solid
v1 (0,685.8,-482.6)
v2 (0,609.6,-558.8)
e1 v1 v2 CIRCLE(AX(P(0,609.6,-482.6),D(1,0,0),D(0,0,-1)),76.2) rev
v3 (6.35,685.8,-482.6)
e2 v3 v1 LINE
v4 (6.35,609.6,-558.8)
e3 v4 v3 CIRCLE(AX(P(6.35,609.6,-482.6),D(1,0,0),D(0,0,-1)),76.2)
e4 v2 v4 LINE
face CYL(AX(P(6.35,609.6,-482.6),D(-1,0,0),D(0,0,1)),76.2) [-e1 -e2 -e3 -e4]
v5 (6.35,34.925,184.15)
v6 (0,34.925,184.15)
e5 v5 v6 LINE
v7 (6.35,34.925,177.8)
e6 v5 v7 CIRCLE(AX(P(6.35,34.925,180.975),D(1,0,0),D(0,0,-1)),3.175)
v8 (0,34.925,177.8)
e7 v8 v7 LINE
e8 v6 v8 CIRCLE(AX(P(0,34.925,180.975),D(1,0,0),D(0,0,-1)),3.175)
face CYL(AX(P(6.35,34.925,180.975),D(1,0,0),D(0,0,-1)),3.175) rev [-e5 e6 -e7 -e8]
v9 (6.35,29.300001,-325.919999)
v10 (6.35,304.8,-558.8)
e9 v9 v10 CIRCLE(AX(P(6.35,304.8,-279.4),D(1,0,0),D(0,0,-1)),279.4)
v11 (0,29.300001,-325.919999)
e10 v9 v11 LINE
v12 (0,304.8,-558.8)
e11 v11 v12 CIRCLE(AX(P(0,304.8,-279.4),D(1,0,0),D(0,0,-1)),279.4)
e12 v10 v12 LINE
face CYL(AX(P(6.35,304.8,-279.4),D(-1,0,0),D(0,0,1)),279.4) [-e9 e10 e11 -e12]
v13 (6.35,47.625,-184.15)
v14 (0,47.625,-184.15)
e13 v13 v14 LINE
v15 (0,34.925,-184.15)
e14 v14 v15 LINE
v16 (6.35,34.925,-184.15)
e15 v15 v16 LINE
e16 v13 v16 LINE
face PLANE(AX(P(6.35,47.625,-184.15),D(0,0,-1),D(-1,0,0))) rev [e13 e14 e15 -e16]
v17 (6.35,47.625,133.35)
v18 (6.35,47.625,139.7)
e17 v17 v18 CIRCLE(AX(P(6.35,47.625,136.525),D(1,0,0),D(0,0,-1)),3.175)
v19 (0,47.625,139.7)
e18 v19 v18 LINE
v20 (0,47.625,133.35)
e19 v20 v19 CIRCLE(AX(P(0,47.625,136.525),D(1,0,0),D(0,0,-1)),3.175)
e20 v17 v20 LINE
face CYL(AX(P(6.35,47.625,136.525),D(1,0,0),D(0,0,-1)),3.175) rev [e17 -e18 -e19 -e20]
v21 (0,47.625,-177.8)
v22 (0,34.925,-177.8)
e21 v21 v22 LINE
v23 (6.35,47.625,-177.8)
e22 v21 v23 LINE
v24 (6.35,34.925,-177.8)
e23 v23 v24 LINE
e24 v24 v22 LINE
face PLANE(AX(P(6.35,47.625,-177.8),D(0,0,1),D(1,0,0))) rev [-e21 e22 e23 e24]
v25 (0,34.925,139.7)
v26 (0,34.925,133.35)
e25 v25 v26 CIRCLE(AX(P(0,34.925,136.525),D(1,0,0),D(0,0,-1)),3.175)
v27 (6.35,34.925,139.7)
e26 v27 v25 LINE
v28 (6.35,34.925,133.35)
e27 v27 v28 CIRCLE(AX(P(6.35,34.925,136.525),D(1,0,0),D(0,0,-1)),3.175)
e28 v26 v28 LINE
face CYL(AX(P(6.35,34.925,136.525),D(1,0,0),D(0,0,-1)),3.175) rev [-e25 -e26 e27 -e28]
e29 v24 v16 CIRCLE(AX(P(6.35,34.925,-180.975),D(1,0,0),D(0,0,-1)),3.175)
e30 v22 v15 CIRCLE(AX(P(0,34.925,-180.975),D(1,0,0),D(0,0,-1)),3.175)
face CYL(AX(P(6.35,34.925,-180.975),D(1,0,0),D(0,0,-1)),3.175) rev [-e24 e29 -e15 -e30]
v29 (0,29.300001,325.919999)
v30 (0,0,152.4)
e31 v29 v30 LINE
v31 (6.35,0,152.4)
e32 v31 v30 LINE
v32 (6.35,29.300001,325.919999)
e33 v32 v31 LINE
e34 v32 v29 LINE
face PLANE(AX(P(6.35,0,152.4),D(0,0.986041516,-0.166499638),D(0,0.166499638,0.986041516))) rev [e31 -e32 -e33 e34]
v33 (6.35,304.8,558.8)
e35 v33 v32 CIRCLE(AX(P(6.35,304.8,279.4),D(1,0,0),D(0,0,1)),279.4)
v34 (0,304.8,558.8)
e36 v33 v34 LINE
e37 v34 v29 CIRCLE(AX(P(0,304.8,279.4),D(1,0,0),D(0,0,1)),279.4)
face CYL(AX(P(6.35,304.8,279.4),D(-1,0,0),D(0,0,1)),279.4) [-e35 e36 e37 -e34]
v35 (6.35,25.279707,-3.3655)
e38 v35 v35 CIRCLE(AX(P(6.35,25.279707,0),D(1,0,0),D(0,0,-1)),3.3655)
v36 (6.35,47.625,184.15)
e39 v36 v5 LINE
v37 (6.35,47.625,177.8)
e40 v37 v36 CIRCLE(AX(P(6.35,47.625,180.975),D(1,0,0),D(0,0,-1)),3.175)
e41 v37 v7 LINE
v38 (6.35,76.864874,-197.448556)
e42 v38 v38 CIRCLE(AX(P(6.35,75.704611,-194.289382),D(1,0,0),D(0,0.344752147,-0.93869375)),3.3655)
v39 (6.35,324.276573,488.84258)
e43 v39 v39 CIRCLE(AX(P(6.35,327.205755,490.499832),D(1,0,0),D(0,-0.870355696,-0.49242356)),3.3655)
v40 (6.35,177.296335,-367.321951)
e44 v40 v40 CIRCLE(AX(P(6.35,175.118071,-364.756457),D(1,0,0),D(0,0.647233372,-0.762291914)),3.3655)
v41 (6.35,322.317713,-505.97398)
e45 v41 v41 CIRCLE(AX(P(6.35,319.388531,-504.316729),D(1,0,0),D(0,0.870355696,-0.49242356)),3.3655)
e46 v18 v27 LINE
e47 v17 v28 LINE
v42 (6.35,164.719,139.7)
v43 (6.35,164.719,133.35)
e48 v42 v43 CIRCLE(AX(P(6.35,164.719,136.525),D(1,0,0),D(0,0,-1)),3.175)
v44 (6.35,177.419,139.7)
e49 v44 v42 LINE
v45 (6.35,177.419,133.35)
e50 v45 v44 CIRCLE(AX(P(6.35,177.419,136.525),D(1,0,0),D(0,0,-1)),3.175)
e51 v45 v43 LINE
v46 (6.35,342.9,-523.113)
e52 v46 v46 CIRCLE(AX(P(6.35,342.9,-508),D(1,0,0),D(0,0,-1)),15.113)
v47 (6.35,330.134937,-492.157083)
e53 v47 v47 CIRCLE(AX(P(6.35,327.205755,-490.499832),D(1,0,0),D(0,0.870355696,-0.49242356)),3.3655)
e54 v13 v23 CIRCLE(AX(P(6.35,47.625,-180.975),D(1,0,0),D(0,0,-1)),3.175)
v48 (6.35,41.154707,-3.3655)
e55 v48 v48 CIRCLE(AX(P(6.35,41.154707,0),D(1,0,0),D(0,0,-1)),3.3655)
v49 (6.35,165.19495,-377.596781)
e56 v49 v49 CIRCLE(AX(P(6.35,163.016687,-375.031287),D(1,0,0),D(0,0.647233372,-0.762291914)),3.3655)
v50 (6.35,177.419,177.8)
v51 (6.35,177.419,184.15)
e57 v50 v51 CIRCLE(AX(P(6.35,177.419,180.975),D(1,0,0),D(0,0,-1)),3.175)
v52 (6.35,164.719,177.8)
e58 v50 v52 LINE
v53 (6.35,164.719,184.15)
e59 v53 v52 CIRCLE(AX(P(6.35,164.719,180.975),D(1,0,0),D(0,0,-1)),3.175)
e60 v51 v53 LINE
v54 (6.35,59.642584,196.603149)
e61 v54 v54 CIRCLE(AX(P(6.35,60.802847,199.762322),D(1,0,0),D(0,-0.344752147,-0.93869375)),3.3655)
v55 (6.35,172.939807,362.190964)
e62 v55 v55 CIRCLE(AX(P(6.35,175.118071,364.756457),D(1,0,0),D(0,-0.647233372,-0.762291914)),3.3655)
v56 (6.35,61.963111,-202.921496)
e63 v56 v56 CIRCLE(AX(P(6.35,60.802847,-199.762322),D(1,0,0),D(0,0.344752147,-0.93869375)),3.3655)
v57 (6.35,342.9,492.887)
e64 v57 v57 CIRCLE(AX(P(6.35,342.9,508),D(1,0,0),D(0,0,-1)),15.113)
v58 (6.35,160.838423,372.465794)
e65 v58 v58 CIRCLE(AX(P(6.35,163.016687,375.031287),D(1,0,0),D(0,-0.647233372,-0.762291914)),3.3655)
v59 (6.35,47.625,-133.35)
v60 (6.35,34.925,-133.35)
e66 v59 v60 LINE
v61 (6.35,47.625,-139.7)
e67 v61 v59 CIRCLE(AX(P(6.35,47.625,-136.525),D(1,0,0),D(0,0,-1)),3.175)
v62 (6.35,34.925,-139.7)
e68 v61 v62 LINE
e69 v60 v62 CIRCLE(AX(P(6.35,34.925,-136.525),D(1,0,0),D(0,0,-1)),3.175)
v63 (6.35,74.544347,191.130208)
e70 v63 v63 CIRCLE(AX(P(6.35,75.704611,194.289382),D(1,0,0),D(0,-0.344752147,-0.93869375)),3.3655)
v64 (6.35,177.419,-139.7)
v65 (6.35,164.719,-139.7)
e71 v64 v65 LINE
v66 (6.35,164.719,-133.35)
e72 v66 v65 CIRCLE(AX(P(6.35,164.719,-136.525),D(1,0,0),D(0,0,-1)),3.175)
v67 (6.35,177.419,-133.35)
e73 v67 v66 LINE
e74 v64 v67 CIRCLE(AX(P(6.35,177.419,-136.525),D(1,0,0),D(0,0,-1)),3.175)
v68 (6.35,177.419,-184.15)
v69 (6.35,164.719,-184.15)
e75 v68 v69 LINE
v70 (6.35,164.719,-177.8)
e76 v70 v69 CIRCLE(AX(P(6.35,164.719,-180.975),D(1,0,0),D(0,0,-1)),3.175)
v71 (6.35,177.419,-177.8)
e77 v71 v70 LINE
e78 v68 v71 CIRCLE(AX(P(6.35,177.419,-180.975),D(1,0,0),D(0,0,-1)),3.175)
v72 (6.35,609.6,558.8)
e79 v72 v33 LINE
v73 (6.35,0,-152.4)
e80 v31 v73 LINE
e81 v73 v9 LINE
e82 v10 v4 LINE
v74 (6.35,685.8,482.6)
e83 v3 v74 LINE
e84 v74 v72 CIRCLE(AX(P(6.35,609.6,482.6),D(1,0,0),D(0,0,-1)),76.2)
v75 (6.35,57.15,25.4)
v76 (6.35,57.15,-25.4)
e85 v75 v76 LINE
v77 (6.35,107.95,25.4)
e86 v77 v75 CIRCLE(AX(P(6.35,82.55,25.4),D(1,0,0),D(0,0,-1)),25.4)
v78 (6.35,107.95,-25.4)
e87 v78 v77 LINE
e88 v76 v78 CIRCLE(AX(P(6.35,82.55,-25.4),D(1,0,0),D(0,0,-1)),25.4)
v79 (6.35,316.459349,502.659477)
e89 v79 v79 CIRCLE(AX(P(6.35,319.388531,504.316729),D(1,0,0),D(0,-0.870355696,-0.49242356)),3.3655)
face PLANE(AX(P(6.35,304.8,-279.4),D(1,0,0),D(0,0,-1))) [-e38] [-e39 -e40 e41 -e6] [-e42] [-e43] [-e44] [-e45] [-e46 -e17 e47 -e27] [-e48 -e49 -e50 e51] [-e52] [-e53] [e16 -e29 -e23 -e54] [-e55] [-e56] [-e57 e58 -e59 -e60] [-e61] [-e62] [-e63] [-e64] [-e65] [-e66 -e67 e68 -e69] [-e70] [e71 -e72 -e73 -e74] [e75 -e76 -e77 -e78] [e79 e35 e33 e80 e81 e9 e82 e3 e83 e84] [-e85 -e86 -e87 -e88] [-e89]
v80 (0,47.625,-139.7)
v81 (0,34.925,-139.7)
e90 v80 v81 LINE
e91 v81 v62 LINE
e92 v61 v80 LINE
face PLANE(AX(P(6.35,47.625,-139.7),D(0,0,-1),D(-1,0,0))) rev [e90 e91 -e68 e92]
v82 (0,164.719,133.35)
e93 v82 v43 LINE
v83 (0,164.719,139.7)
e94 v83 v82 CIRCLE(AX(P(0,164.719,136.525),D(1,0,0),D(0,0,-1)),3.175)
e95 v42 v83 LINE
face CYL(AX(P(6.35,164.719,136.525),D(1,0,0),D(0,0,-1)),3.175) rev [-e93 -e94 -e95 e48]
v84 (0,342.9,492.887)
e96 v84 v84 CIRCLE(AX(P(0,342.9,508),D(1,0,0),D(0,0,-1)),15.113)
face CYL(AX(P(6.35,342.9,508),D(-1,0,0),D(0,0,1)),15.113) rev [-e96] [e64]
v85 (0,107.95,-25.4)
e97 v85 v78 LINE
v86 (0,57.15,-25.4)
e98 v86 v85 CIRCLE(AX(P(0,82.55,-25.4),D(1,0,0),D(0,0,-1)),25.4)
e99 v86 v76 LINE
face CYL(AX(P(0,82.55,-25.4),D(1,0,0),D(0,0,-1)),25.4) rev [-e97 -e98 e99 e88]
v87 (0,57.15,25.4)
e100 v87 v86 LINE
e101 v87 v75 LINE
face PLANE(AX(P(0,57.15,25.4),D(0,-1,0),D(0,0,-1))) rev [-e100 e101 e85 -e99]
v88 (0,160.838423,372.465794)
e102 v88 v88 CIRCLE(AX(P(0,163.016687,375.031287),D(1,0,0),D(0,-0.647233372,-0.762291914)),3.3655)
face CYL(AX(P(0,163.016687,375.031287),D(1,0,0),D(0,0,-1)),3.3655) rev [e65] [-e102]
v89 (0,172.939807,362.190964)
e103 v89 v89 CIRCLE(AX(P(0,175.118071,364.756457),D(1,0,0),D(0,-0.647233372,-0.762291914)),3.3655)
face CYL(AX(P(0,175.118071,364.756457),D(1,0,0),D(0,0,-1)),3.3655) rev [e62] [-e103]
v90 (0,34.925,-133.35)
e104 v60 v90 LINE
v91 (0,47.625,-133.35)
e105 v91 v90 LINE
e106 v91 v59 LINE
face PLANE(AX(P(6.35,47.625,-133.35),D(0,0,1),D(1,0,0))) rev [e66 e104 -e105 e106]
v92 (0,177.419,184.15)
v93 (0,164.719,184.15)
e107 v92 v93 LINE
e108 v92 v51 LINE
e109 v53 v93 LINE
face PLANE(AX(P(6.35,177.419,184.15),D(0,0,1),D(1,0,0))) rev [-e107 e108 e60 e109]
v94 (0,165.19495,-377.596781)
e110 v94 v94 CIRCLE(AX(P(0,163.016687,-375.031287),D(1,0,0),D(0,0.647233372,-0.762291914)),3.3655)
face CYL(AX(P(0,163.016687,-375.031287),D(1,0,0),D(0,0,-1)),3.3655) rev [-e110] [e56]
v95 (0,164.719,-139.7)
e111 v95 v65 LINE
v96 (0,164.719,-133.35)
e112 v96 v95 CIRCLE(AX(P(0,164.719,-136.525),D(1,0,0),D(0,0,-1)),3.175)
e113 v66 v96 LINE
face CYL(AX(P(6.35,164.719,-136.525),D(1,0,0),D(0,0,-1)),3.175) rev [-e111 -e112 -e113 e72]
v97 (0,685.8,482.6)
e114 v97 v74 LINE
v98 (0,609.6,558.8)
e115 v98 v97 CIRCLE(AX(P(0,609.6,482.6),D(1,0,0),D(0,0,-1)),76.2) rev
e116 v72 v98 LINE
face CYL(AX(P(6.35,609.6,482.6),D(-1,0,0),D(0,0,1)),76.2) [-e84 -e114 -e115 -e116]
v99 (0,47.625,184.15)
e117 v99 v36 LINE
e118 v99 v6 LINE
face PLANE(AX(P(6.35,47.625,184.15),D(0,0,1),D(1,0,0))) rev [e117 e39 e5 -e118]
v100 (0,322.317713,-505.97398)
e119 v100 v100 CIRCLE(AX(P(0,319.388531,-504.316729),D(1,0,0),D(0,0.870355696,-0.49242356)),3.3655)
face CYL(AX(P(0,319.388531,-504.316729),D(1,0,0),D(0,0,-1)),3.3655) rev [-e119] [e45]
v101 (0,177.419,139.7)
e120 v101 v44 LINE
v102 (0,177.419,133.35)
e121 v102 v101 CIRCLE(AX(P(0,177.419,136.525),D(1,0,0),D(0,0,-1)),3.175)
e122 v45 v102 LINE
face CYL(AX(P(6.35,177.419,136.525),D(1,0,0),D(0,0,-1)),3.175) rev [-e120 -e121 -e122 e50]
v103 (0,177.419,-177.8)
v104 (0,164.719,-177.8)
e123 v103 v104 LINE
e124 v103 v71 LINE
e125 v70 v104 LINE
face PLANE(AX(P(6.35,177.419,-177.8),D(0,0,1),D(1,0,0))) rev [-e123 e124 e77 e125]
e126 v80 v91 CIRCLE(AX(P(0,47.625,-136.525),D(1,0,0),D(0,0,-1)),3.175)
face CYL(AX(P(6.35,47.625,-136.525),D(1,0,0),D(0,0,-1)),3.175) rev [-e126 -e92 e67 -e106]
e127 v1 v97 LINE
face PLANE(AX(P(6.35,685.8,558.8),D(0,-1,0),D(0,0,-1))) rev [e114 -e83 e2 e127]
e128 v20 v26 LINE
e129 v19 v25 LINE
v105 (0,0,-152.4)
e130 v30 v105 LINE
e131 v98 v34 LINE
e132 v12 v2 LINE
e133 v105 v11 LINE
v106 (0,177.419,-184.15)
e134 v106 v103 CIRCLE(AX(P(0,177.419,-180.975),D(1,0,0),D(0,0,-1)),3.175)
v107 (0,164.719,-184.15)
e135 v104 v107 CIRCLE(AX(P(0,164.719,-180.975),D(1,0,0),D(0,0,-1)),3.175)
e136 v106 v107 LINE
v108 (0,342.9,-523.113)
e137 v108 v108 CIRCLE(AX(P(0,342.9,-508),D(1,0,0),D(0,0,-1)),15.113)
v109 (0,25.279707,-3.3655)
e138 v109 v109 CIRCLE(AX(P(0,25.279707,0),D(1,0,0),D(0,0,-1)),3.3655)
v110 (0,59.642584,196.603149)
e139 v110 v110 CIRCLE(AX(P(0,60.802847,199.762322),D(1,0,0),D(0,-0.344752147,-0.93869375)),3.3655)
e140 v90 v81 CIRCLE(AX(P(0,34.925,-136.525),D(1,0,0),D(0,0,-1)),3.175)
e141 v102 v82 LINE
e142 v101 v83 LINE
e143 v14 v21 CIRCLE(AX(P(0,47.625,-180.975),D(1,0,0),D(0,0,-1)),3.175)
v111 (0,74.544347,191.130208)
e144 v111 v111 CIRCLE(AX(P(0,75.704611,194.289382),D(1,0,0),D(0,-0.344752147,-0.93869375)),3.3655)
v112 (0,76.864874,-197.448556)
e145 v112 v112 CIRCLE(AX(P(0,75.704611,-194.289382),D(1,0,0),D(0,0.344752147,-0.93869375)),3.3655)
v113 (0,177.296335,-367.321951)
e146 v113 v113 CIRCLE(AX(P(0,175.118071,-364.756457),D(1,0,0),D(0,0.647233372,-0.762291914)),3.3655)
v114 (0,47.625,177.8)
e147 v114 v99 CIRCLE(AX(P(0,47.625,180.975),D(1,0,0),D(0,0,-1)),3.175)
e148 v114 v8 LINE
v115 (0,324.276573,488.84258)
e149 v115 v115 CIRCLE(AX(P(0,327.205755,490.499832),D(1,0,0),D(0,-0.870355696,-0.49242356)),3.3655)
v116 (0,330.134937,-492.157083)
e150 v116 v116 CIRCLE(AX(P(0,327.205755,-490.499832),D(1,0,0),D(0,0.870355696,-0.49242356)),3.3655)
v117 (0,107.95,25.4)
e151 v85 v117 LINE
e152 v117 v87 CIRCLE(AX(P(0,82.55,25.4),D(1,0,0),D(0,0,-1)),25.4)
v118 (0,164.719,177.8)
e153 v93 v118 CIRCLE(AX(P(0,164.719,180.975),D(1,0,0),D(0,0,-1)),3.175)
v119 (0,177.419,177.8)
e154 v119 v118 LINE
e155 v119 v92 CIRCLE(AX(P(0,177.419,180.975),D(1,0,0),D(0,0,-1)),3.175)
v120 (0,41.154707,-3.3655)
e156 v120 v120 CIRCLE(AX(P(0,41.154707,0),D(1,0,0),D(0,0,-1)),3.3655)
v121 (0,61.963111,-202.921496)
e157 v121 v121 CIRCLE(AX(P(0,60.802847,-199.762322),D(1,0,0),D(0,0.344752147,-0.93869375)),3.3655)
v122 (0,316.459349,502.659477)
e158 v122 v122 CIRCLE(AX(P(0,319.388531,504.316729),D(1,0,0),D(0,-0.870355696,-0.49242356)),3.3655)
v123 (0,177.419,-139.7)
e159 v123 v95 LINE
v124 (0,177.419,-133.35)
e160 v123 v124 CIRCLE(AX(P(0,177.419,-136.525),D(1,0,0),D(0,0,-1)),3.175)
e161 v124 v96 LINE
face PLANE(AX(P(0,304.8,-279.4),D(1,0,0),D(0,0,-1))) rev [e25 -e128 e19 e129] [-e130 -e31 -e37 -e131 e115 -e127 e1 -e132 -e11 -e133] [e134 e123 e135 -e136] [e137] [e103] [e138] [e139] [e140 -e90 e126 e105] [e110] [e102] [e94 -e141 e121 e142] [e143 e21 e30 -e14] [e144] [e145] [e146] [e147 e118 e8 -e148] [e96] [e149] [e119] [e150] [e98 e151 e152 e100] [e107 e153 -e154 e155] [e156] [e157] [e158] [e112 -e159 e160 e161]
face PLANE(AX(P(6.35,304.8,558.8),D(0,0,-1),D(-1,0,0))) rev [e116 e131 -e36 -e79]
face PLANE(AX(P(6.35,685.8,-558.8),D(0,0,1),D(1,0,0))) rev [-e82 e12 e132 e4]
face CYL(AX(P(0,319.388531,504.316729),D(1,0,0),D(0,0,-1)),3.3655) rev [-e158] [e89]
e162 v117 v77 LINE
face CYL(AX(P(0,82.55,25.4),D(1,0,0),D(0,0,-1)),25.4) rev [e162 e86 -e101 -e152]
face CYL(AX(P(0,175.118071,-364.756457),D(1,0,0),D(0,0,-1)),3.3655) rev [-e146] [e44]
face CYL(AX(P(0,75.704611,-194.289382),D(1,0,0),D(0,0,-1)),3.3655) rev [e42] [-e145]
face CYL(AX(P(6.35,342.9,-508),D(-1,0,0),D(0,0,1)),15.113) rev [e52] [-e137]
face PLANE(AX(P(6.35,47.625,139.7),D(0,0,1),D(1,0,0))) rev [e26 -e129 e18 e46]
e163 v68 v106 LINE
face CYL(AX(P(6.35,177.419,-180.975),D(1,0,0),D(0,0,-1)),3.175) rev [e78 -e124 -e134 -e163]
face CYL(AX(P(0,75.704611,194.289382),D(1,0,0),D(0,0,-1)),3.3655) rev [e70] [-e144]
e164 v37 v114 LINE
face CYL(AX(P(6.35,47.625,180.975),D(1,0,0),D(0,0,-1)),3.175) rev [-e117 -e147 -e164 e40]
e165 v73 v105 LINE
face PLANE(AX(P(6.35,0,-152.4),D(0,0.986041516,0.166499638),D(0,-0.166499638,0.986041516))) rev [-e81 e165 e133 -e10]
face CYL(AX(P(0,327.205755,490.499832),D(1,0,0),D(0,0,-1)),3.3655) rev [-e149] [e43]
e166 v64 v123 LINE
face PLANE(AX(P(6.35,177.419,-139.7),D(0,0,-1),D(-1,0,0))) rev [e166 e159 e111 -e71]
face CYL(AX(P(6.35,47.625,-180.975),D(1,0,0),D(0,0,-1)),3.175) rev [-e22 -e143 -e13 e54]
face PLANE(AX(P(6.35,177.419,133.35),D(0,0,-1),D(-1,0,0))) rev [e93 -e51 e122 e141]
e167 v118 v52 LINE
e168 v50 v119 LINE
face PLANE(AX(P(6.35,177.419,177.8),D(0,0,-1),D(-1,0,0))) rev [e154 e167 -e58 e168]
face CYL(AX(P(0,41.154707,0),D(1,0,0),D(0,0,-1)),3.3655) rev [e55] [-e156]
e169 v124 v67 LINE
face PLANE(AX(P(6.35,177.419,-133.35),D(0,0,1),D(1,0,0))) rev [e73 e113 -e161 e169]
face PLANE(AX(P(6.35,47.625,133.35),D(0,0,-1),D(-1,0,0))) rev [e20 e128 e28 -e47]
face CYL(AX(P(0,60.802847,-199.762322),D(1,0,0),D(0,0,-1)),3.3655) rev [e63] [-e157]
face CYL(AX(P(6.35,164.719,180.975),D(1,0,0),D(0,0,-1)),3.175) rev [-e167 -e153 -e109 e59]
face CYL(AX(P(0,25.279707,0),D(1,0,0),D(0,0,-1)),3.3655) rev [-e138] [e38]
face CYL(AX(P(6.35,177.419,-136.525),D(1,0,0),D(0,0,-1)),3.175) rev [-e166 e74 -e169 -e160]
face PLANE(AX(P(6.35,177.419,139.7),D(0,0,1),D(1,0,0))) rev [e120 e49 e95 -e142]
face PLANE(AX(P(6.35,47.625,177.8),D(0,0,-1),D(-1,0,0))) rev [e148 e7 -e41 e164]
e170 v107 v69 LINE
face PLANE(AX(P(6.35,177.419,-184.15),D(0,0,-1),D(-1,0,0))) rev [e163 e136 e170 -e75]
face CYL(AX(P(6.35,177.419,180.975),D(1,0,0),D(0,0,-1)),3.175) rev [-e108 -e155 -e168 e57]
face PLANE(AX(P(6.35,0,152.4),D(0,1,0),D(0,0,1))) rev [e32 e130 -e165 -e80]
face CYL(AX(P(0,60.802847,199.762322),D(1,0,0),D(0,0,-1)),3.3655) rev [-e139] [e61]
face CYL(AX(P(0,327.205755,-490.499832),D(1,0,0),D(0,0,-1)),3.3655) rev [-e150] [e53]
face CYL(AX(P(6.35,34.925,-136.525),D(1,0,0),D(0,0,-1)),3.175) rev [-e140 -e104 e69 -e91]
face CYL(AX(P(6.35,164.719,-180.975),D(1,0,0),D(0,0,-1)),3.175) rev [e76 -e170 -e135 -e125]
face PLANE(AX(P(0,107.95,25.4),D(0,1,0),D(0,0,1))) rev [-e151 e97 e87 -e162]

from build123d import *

# Parameters (mm, degrees)
SKETCH1_R                       = 15.113
BOSS_EXTRUDE1_DEPTH             = 6.35
FILLET1_R                       = 76.2
F_1_4_0_25_DIAMETER_SLOT1_DEPTH = 6.35
SKETCH4_R                       = 3.3655
CUT_EXTRUDE1_DEPTH              = 885.657788357
CIRPATTERN1_COUNT               = 4
CIRPATTERN1_ANGLE               = 60.5
CIRPATTERN1_THE_OTHER_WAY_COUNT = 4
CIRPATTERN1_THE_OTHER_WAY_ANGLE = 60.5
CUT_EXTRUDE2_DEPTH              = 885.657788357


# Read off the part's stored shape, not the designer's step: 1/4 (0.25) Diameter Slot1
with BuildPart() as part:
    # Sketch1 → Boss-Extrude1 (new body)
    with BuildSketch(Plane(origin=(0, 0, 0), x_dir=(0, 0, -1), z_dir=(1, 0, 0))):
        with BuildLine():
            Line((-558.8, 304.8), (-558.8, 685.8))
            Line((-558.8, 685.8), (558.8, 685.8))
            Line((558.8, 685.8), (558.8, 304.8))
            ThreePointArc((558.8, 304.8), (492.779998657, 124.430002015), (325.91999876, 29.300000517))
            Line((325.91999876, 29.300000517), (152.4, 0))
            Line((152.4, 0), (-152.4, 0))
            Line((-152.4, 0), (-325.91999876, 29.300000517))
            ThreePointArc((-325.91999876, 29.300000517), (-492.779998657, 124.430002015), (-558.8, 304.8))
        make_face()
        with Locations((-508, 342.9)):
            Circle(SKETCH1_R, mode=Mode.SUBTRACT)
        with Locations((508, 342.9)):
            Circle(SKETCH1_R, mode=Mode.SUBTRACT)
    extrude(amount=BOSS_EXTRUDE1_DEPTH)

    # Fillet1
    fillet1_edges = [part.edges().sort_by_distance(p)[0] for p in [
        (3.175, 685.8, 558.8),
        (3.175, 685.8, -558.8),
    ]]
    fillet(fillet1_edges, radius=FILLET1_R)

    # 1/4 (0.25) Diameter Slot1 outline → 1/4 (0.25) Diameter Slot1 (cut)
    with BuildSketch(Plane.YZ):
        with BuildLine():
            Line((47.625, -177.8), (34.925, -177.8))
            ThreePointArc((34.925, -177.8), (31.75, -180.975), (34.925, -184.15))
            Line((34.925, -184.15), (47.625, -184.15))
            ThreePointArc((47.625, -184.15), (50.8, -180.975), (47.625, -177.8))
        make_face()
        with BuildLine():
            ThreePointArc((164.719, -177.8), (161.544, -180.975), (164.719, -184.15))
            Line((164.719, -184.15), (177.419, -184.15))
            ThreePointArc((177.419, -184.15), (180.594, -180.975), (177.419, -177.8))
            Line((177.419, -177.8), (164.719, -177.8))
        make_face()
        with BuildLine():
            Line((47.625, -133.35), (34.925, -133.35))
            ThreePointArc((34.925, -133.35), (31.75, -136.525), (34.925, -139.7))
            Line((34.925, -139.7), (47.625, -139.7))
            ThreePointArc((47.625, -139.7), (50.8, -136.525), (47.625, -133.35))
        make_face()
        with BuildLine():
            ThreePointArc((164.719, -133.35), (161.544, -136.525), (164.719, -139.7))
            Line((164.719, -139.7), (177.419, -139.7))
            ThreePointArc((177.419, -139.7), (180.594, -136.525), (177.419, -133.35))
            Line((177.419, -133.35), (164.719, -133.35))
        make_face()
        with BuildLine():
            Line((177.419, 139.7), (164.719, 139.7))
            ThreePointArc((164.719, 139.7), (161.544, 136.525), (164.719, 133.35))
            Line((164.719, 133.35), (177.419, 133.35))
            ThreePointArc((177.419, 133.35), (180.594, 136.525), (177.419, 139.7))
        make_face()
        with BuildLine():
            ThreePointArc((34.925, 139.7), (31.75, 136.525), (34.925, 133.35))
            Line((34.925, 133.35), (47.625, 133.35))
            ThreePointArc((47.625, 133.35), (50.8, 136.525), (47.625, 139.7))
            Line((47.625, 139.7), (34.925, 139.7))
        make_face()
        with BuildLine():
            Line((47.625, 184.15), (34.925, 184.15))
            ThreePointArc((34.925, 184.15), (31.75, 180.975), (34.925, 177.8))
            Line((34.925, 177.8), (47.625, 177.8))
            ThreePointArc((47.625, 177.8), (50.8, 180.975), (47.625, 184.15))
        make_face()
        with BuildLine():
            ThreePointArc((164.719, 184.15), (161.544, 180.975), (164.719, 177.8))
            Line((164.719, 177.8), (177.419, 177.8))
            ThreePointArc((177.419, 177.8), (180.594, 180.975), (177.419, 184.15))
            Line((177.419, 184.15), (164.719, 184.15))
        make_face()
    extrude(amount=F_1_4_0_25_DIAMETER_SLOT1_DEPTH, mode=Mode.SUBTRACT)

    # Sketch4 → Cut-Extrude1 (cut, through all)
    with BuildSketch(Plane(origin=(6.35, 0, 0), x_dir=(0, 0, -1), z_dir=(1, 0, 0))):
        with Locations((0, 41.154707227)):
            Circle(SKETCH4_R)
        with Locations((0, 25.279707227)):
            Circle(SKETCH4_R)
    cut_extrude1 = extrude(amount=-CUT_EXTRUDE1_DEPTH, mode=Mode.SUBTRACT)

    # CirPattern1: Cut-Extrude1 ×4 about axis
    cirpattern1_axis = Axis((0, 604.717207227, 0), (-1, 0, 0))
    for i in range(1, CIRPATTERN1_COUNT):
        add(cut_extrude1.rotate(cirpattern1_axis, i * CIRPATTERN1_ANGLE / (CIRPATTERN1_COUNT - 1)), mode=Mode.SUBTRACT)

    # CirPattern1 the other way: Cut-Extrude1 ×4 about axis
    cirpattern1_the_other_way_axis = Axis((0, 604.717207227, 0), (1, 0, 0))
    for i in range(1, CIRPATTERN1_THE_OTHER_WAY_COUNT):
        add(cut_extrude1.rotate(cirpattern1_the_other_way_axis, i * CIRPATTERN1_THE_OTHER_WAY_ANGLE / (CIRPATTERN1_THE_OTHER_WAY_COUNT - 1)), mode=Mode.SUBTRACT)

    # Sketch6 → Cut-Extrude2 (cut, through all)
    with BuildSketch(Plane(origin=(6.35, 0, 0), x_dir=(0, 0, -1), z_dir=(1, 0, 0))):
        with BuildLine():
            Line((-25.4, 107.95), (25.4, 107.95))
            ThreePointArc((25.4, 107.95), (50.8, 82.55), (25.4, 57.15))
            Line((25.4, 57.15), (-25.4, 57.15))
            ThreePointArc((-25.4, 57.15), (-50.8, 82.55), (-25.4, 107.95))
        make_face()
    extrude(amount=-CUT_EXTRUDE2_DEPTH, mode=Mode.SUBTRACT)


solid = part.part
